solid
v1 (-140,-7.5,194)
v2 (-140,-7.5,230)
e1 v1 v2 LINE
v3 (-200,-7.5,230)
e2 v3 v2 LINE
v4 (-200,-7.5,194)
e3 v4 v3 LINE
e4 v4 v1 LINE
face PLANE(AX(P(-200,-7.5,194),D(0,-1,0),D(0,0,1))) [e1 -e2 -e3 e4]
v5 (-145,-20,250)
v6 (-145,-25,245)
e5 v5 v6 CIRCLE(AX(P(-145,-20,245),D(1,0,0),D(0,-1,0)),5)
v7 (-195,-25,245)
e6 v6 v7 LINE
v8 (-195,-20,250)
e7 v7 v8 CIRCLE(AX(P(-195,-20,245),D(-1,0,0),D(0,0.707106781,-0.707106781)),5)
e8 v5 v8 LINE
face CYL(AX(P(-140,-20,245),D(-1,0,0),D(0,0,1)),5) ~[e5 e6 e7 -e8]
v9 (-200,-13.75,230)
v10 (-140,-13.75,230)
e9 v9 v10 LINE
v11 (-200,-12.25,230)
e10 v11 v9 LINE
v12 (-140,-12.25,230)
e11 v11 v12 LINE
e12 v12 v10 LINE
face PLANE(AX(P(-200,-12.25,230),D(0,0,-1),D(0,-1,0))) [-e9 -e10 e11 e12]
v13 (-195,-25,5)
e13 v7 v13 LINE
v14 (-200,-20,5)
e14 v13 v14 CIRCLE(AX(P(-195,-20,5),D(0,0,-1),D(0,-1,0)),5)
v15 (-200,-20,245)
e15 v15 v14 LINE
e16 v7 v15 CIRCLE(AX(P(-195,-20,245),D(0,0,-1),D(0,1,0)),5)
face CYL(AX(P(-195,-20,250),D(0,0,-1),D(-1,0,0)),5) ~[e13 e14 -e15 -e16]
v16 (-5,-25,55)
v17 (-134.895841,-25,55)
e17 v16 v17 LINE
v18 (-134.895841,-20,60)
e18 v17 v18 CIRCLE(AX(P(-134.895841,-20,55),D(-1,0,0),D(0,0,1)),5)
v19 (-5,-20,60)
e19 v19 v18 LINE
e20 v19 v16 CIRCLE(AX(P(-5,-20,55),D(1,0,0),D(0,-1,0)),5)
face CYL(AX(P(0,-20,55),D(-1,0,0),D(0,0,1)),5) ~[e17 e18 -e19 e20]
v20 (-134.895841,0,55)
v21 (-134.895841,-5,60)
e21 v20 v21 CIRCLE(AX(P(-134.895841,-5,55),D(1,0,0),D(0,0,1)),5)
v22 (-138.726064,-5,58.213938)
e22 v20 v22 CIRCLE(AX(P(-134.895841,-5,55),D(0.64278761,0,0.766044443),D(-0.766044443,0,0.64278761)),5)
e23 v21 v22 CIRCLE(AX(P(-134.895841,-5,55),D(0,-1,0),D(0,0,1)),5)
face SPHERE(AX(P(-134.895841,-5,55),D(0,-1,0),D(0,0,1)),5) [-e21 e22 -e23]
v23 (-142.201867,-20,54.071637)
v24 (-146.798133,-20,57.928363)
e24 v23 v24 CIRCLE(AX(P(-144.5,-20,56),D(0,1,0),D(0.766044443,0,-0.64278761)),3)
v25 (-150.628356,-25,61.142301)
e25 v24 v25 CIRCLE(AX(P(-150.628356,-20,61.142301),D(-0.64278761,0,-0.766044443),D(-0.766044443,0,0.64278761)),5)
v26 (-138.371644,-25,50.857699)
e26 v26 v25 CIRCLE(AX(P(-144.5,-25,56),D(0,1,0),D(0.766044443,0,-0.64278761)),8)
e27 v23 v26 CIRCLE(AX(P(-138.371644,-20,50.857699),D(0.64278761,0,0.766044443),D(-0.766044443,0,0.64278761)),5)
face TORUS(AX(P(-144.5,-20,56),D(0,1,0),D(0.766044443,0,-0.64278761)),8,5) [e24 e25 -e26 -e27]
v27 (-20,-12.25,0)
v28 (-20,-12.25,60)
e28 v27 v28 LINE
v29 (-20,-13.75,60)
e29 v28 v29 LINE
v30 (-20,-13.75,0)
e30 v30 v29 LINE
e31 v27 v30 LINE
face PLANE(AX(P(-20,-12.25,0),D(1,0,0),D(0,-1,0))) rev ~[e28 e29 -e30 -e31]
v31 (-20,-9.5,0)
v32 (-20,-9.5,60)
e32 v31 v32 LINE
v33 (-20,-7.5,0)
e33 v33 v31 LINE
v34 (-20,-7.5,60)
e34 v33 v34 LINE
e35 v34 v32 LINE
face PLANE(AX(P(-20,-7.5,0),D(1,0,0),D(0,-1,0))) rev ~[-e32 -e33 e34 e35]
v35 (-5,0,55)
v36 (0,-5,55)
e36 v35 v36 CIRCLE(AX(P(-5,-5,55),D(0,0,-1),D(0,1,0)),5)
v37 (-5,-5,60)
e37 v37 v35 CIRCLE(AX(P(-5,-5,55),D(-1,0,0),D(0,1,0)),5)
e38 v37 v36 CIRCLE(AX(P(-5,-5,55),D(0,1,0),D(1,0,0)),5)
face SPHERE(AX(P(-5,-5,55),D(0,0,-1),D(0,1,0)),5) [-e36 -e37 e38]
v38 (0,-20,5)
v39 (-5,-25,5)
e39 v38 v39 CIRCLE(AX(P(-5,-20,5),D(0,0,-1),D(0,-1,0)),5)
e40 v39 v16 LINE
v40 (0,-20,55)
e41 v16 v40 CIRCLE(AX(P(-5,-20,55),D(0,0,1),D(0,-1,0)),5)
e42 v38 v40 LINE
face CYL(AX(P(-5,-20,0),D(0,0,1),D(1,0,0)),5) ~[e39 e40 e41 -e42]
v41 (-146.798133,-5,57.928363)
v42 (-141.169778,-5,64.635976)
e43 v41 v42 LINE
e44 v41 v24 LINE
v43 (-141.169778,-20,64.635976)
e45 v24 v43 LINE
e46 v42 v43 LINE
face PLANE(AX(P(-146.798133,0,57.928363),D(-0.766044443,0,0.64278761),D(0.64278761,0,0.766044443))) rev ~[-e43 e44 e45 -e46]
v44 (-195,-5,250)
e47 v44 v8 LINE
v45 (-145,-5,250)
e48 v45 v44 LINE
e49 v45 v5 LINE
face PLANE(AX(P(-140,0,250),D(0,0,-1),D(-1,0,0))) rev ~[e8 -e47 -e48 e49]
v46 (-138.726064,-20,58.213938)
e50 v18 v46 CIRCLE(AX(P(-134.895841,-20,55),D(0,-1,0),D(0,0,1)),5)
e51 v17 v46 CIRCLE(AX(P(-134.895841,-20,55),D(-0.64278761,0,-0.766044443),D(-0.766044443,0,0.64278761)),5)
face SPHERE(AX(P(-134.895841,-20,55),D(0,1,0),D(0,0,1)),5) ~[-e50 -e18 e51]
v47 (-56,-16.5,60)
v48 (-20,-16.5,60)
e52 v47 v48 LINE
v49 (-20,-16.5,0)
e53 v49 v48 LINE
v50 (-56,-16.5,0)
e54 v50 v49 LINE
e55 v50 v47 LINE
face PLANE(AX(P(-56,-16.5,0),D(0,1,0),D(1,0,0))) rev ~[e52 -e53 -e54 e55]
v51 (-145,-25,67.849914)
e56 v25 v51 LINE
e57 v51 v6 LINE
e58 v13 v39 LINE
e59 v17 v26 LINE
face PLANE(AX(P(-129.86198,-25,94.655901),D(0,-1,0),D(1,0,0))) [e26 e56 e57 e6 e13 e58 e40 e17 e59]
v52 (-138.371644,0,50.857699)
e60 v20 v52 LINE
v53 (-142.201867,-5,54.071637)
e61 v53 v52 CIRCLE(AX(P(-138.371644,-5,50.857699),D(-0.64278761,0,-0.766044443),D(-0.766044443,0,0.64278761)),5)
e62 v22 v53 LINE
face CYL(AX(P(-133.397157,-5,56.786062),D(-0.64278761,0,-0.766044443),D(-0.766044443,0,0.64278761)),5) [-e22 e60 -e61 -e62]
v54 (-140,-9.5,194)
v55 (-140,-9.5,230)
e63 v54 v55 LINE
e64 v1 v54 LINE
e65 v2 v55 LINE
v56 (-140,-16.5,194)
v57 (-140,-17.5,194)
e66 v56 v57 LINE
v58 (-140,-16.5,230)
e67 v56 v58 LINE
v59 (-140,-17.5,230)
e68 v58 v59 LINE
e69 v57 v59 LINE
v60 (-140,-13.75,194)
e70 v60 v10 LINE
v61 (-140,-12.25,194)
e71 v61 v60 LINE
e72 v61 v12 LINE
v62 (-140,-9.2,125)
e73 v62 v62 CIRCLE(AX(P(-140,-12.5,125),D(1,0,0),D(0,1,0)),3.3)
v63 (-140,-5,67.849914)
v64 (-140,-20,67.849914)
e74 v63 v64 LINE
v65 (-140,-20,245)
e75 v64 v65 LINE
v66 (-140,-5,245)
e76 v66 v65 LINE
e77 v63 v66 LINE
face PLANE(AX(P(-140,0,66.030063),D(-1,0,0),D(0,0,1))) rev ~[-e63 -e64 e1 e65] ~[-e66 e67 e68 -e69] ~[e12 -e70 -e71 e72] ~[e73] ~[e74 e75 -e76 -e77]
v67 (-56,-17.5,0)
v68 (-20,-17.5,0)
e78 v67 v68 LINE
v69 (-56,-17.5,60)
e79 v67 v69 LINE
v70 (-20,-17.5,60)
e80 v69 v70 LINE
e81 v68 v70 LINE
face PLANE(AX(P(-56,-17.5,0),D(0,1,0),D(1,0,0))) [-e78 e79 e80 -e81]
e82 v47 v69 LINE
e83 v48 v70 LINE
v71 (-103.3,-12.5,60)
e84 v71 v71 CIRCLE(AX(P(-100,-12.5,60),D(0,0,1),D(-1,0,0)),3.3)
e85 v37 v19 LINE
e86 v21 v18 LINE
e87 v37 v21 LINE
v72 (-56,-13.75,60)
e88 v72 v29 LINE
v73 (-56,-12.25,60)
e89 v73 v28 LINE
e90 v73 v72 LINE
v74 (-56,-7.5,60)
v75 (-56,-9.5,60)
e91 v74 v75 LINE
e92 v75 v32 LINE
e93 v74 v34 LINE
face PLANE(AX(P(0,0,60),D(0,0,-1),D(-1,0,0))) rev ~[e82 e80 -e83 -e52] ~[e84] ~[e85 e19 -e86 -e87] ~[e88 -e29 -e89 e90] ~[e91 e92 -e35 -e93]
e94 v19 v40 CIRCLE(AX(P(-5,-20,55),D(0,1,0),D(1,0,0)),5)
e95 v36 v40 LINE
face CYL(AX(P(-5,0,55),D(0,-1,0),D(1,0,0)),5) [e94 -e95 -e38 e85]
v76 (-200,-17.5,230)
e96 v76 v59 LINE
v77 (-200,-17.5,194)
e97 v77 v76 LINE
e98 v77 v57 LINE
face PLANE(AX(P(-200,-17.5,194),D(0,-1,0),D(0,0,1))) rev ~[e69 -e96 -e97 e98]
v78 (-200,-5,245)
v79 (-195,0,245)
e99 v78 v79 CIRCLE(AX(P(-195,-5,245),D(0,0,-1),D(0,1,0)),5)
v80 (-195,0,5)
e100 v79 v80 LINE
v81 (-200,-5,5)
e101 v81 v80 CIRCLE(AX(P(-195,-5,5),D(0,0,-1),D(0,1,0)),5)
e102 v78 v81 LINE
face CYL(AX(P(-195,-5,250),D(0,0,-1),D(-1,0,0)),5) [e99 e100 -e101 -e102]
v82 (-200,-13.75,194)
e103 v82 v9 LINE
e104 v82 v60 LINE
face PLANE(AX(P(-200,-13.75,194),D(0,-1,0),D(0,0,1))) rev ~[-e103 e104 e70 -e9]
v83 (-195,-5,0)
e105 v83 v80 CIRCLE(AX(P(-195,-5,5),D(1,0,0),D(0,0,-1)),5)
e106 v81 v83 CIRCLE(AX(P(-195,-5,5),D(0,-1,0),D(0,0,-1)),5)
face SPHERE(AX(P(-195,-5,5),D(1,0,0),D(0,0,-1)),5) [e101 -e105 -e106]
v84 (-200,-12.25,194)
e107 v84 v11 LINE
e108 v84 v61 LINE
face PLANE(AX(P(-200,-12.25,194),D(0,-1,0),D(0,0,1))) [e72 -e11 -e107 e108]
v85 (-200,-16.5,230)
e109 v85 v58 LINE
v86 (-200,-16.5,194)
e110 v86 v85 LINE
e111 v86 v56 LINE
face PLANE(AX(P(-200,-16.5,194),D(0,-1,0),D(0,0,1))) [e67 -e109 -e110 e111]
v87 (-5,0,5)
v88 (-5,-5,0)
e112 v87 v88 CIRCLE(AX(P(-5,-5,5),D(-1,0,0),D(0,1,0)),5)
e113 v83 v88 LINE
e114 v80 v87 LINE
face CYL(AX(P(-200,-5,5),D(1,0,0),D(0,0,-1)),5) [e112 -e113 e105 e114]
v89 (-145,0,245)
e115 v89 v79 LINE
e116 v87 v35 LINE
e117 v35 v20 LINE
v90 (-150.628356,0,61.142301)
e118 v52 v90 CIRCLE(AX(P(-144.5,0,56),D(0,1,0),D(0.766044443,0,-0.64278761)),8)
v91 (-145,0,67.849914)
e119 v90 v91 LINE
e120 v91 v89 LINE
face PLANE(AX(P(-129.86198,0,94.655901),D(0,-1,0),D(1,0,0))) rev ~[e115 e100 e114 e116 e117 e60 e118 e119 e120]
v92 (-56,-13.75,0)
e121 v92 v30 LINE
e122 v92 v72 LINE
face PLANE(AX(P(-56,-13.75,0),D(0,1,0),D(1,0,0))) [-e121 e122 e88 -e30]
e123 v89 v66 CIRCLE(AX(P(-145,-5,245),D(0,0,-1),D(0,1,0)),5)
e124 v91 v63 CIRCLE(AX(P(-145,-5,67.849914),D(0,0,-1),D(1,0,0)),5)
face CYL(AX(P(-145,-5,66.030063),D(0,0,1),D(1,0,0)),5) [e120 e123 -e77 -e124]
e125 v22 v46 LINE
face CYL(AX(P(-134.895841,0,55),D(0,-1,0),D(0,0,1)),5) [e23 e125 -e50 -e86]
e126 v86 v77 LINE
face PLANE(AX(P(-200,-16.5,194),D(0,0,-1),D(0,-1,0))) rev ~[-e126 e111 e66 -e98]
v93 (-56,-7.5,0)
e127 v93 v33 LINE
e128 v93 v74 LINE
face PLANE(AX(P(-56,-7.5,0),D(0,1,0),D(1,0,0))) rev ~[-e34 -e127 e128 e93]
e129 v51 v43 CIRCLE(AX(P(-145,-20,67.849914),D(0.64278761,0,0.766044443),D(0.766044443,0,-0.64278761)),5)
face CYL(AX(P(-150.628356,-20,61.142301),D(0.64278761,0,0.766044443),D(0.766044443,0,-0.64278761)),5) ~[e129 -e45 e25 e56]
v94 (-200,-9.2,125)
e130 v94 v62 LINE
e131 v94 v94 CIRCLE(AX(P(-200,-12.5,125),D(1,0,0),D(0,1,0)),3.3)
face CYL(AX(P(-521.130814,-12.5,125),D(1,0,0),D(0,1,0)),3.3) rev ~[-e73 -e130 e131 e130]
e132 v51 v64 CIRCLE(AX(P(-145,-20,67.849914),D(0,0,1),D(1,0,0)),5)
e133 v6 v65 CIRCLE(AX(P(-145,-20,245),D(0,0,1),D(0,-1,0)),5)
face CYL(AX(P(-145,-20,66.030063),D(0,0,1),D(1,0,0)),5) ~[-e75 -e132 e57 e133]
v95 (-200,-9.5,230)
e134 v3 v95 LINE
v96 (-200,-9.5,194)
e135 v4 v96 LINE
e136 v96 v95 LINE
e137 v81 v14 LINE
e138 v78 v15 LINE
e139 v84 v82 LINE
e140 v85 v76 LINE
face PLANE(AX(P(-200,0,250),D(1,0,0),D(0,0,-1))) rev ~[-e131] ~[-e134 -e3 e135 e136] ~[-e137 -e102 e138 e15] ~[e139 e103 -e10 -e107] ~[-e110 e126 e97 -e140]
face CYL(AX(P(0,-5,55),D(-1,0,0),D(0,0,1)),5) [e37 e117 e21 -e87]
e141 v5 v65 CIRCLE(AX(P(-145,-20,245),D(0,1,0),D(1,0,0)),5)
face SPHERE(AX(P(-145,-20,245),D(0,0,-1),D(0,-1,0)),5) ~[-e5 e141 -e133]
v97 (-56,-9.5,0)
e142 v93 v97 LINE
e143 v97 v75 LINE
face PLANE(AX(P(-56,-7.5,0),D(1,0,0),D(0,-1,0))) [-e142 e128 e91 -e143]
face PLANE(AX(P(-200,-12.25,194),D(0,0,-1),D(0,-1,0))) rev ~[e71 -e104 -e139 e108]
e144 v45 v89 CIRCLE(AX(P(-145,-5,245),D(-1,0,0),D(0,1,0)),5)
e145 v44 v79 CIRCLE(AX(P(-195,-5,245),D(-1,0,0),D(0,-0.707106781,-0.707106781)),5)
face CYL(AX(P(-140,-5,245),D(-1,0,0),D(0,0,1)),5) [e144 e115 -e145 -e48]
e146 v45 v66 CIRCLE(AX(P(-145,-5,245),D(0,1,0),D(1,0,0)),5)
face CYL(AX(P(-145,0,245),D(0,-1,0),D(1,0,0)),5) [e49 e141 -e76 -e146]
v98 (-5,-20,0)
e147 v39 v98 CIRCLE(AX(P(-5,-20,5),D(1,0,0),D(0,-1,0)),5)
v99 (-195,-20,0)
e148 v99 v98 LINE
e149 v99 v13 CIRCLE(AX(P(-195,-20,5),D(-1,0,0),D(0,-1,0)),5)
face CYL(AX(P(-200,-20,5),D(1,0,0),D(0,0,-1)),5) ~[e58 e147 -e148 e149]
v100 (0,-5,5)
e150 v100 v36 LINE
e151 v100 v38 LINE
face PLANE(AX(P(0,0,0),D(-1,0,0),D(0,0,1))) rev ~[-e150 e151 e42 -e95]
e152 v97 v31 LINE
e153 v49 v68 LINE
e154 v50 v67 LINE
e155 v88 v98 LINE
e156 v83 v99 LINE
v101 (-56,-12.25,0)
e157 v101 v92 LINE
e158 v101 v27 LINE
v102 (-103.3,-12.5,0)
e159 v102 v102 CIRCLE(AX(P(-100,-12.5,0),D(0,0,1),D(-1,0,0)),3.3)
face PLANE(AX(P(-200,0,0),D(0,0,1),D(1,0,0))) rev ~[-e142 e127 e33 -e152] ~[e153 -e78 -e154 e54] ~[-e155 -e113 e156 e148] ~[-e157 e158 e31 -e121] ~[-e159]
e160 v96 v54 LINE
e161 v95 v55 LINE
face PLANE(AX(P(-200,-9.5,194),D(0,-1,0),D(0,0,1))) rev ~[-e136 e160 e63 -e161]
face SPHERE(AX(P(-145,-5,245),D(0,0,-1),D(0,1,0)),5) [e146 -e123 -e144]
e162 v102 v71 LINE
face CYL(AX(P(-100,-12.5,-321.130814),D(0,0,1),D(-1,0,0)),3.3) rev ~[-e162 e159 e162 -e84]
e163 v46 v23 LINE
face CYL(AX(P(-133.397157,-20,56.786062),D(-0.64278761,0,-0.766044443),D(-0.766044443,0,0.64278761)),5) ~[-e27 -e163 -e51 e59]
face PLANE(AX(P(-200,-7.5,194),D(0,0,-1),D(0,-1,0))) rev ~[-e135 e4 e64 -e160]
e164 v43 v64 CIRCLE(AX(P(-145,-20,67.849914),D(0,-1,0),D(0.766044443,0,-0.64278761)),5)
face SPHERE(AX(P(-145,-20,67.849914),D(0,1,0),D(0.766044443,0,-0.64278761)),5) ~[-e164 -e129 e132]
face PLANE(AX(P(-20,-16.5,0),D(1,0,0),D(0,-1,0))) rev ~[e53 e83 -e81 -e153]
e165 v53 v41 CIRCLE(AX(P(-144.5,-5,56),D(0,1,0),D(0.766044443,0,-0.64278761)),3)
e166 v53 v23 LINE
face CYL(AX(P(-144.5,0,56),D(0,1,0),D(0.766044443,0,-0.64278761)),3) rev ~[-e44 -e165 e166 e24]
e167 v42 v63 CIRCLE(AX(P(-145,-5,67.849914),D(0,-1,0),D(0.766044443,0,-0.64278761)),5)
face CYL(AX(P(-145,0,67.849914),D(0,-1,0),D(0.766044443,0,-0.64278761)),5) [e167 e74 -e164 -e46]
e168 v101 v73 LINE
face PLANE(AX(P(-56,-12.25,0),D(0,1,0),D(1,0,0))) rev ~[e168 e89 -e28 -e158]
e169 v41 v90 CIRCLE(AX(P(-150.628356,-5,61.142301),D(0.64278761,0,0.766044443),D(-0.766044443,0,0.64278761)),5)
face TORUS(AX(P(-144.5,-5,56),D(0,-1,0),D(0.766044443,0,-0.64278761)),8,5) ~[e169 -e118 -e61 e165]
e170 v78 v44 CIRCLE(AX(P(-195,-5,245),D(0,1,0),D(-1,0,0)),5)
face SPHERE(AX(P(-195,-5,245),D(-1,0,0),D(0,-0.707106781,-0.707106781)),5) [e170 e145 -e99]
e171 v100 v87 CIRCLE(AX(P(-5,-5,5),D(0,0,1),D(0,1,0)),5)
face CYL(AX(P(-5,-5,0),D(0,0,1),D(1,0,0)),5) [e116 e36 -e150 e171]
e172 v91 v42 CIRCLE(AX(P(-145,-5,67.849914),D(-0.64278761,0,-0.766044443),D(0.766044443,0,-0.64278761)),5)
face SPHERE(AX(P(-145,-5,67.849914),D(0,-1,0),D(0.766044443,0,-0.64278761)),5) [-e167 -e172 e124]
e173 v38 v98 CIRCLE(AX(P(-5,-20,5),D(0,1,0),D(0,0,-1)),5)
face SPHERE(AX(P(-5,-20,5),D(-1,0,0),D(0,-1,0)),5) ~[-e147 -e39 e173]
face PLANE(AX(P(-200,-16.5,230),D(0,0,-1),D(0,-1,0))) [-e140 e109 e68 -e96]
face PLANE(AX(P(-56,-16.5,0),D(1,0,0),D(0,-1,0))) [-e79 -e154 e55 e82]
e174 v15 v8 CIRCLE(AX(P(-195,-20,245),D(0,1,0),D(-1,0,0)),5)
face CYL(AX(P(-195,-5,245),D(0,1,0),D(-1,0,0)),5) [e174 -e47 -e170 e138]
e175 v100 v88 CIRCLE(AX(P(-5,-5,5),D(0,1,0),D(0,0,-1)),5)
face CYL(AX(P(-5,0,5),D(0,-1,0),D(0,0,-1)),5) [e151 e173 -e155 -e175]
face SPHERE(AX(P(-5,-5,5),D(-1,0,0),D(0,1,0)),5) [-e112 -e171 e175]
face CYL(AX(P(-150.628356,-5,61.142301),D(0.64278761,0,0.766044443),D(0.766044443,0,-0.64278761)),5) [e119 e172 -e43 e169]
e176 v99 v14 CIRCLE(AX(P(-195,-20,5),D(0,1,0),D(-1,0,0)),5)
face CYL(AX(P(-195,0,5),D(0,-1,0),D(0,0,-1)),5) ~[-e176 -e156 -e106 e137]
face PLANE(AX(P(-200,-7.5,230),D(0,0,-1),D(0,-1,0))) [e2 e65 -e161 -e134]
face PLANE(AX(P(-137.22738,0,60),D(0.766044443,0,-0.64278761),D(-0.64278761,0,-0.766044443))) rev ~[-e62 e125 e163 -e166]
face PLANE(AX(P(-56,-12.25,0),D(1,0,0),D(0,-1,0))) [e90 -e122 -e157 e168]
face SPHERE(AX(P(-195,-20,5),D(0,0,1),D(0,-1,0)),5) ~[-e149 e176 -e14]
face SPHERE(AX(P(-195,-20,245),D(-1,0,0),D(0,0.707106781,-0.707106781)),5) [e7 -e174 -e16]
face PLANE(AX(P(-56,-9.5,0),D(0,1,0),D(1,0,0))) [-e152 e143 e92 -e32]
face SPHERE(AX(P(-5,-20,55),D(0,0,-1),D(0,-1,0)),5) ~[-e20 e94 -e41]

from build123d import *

# Parameters (mm, degrees)
F1_DEPTH     = 25
F2_R         = 5
F3_T1_DEPTH  = 15
F3_S5_W      = 5
F3_S5_H      = 5
F3_T6_DEPTH  = 5
F3_S11_W     = 5
F3_S11_H     = 5
F3_T12_DEPTH = 5
F4_W         = 36
F4_H         = 1
F4_H_2       = 1.5
F4_H_3       = 2
F5_DEPTH     = 64.1
F7_D         = 6.6
F8_W         = 2
F8_H         = 36
F8_W_2       = 1
F8_W_3       = 1.5
F9_DEPTH     = 69
F11_D        = 6.6


# Not quite as in the source:
# - a fillet or chamfer that OpenCascade refuses, or shapes differently, is made with other operations: its cross-section is extruded or revolved along the edge and cut away or added


with BuildPart() as f1:
    # F0 (on Front) → F1 (new body)
    with BuildSketch(Plane.XZ):
        with BuildLine():
            Line((-200, 0), (0, 0))
            Line((0, 0), (0, 60))
            Line((0, 60), (-137.2273796073, 60))
            Line((-137.2273796073, 60), (-142.2018666706, 54.0716371709))
            ThreePointArc((-142.2018666706, 54.0716371709), (-146.4283628291, 53.7018666706), (-146.7981333294, 57.9283628291))
            Line((-146.7981333294, 57.9283628291), (-140, 66.0300626473))
            Line((-140, 66.0300626473), (-140, 250))
            Line((-140, 250), (-200, 250))
            Line((-200, 250), (-200, 0))
        make_face()
    extrude(amount=F1_DEPTH)

    # F2
    f2_edges = [f1.edges().sort_by_distance(p)[0] for p in [
        (-200, -25, 125),
        (-100, -25, 0),
        (0, -25, 30),
        (-68.61369, -25, 60),
        (-139.714623, -25, 57.035819),
        (-146.428363, -25, 53.701867),
        (-143.399067, -25, 61.979213),
        (-140, -25, 158.015031),
        (-170, -25, 250),
        (-100, 0, 0),
        (-200, -12.5, 0),
        (-200, 0, 125),
        (0, 0, 30),
        (-68.61369, 0, 60),
        (-139.714623, 0, 57.035819),
        (-146.428363, 0, 53.701867),
        (-143.399067, 0, 61.979213),
        (-140, 0, 158.015031),
        (-170, 0, 250),
        (0, -12.5, 0),
        (0, -12.5, 60),
        (-137.22738, -12.5, 60),
        (-140, -12.5, 66.030063),
        (-140, -12.5, 250),
    ]]
    fillet(f2_edges, radius=F2_R)

    # F3: fillet of radius 5 on 1 edges, made by hand

    # F3_s2 → F3_t1 (cut)
    with BuildSketch(Plane.XZ.offset(5)):
        with BuildLine():
            ThreePointArc((-200, 245), (-198.5355339059, 248.5355339059), (-195, 250))
            Line((-195, 250), (-200, 250))
            Line((-200, 250), (-200, 245))
        make_face()
    extrude(amount=F3_T1_DEPTH, mode=Mode.SUBTRACT)


with BuildPart() as f3_tool4:
    # F3_s5 → F3_t6 (new body)
    with BuildSketch(Plane.YZ.offset(-195)):
        with Locations((-2.5, 247.5)):
            Rectangle(F3_S5_W, F3_S5_H)
    extrude(amount=-F3_T6_DEPTH)

    # F3_s7 → F3_t8 (revolve, cut)
    with BuildSketch(Plane(origin=(-195, -5, 245), x_dir=(0, -0.7071067812, -0.7071067812), z_dir=(0, 0.7071067812, -0.7071067812))):
        with BuildLine():
            ThreePointArc((0, -5), (5, 0), (0, 5))
            Line((0, 5), (0, -5))
        make_face()
    revolve(axis=Axis((-195, -5, 245), (-1, 0, 0)), mode=Mode.SUBTRACT)


with BuildPart() as f1_1:
    add(f1.part)

    # F3_t3: cut F3_tool4
    add(f3_tool4.part, mode=Mode.SUBTRACT)


with BuildPart() as f3_tool10:
    # F3_s11 → F3_t12 (new body)
    with BuildSketch(Plane.YZ.offset(-195)):
        with Locations((-22.5, 247.5)):
            Rectangle(F3_S11_W, F3_S11_H)
    extrude(amount=-F3_T12_DEPTH)

    # F3_s13 → F3_t14 (revolve, cut)
    with BuildSketch(Plane(origin=(-195, -20, 245), x_dir=(0, 0.7071067812, -0.7071067812), z_dir=(0, 0.7071067812, 0.7071067812))):
        with BuildLine():
            ThreePointArc((0, -5), (5, 0), (0, 5))
            Line((0, 5), (0, -5))
        make_face()
    revolve(axis=Axis((-195, -20, 245), (-1, 0, 0)), mode=Mode.SUBTRACT)


with BuildPart() as f1_2:
    add(f1_1.part)

    # F3_t9: cut F3_tool10
    add(f3_tool10.part, mode=Mode.SUBTRACT)

    # F4 (on face) → F5 (cut)
    with BuildSketch(Plane(origin=(0, 0, 0), x_dir=(1, 0, 0), z_dir=(0, 0, -1))):
        with Locations((-38, 17)):
            Rectangle(F4_W, F4_H)
        with Locations((-38, 13)):
            Rectangle(F4_W, F4_H_2)
        with Locations((-38, 8.5)):
            Rectangle(F4_W, F4_H_3)
    extrude(amount=-F5_DEPTH, mode=Mode.SUBTRACT)

    # F7 (through all)
    with Locations(Plane(origin=(0, 0, 0), x_dir=(1, 0, 0), z_dir=(0, 0, -1))):
        with Locations((-100, 12.5)):
            Hole(F7_D / 2)

    # F8 (on face) → F9 (cut)
    with BuildSketch(Plane(origin=(-200, 0, 0), x_dir=(0, -1, 0), z_dir=(-1, 0, 0))):
        with Locations((8.5, 212)):
            Rectangle(F8_W, F8_H)
        with Locations((17, 212)):
            Rectangle(F8_W_2, F8_H)
        with Locations((13, 212)):
            Rectangle(F8_W_3, F8_H)
    extrude(amount=-F9_DEPTH, mode=Mode.SUBTRACT)

    # F11 (through all)
    with Locations(Plane(origin=(-200, 0, 0), x_dir=(0, -1, 0), z_dir=(-1, 0, 0))):
        with Locations((12.5, 125)):
            Hole(F11_D / 2)


solid = f1_2.part
